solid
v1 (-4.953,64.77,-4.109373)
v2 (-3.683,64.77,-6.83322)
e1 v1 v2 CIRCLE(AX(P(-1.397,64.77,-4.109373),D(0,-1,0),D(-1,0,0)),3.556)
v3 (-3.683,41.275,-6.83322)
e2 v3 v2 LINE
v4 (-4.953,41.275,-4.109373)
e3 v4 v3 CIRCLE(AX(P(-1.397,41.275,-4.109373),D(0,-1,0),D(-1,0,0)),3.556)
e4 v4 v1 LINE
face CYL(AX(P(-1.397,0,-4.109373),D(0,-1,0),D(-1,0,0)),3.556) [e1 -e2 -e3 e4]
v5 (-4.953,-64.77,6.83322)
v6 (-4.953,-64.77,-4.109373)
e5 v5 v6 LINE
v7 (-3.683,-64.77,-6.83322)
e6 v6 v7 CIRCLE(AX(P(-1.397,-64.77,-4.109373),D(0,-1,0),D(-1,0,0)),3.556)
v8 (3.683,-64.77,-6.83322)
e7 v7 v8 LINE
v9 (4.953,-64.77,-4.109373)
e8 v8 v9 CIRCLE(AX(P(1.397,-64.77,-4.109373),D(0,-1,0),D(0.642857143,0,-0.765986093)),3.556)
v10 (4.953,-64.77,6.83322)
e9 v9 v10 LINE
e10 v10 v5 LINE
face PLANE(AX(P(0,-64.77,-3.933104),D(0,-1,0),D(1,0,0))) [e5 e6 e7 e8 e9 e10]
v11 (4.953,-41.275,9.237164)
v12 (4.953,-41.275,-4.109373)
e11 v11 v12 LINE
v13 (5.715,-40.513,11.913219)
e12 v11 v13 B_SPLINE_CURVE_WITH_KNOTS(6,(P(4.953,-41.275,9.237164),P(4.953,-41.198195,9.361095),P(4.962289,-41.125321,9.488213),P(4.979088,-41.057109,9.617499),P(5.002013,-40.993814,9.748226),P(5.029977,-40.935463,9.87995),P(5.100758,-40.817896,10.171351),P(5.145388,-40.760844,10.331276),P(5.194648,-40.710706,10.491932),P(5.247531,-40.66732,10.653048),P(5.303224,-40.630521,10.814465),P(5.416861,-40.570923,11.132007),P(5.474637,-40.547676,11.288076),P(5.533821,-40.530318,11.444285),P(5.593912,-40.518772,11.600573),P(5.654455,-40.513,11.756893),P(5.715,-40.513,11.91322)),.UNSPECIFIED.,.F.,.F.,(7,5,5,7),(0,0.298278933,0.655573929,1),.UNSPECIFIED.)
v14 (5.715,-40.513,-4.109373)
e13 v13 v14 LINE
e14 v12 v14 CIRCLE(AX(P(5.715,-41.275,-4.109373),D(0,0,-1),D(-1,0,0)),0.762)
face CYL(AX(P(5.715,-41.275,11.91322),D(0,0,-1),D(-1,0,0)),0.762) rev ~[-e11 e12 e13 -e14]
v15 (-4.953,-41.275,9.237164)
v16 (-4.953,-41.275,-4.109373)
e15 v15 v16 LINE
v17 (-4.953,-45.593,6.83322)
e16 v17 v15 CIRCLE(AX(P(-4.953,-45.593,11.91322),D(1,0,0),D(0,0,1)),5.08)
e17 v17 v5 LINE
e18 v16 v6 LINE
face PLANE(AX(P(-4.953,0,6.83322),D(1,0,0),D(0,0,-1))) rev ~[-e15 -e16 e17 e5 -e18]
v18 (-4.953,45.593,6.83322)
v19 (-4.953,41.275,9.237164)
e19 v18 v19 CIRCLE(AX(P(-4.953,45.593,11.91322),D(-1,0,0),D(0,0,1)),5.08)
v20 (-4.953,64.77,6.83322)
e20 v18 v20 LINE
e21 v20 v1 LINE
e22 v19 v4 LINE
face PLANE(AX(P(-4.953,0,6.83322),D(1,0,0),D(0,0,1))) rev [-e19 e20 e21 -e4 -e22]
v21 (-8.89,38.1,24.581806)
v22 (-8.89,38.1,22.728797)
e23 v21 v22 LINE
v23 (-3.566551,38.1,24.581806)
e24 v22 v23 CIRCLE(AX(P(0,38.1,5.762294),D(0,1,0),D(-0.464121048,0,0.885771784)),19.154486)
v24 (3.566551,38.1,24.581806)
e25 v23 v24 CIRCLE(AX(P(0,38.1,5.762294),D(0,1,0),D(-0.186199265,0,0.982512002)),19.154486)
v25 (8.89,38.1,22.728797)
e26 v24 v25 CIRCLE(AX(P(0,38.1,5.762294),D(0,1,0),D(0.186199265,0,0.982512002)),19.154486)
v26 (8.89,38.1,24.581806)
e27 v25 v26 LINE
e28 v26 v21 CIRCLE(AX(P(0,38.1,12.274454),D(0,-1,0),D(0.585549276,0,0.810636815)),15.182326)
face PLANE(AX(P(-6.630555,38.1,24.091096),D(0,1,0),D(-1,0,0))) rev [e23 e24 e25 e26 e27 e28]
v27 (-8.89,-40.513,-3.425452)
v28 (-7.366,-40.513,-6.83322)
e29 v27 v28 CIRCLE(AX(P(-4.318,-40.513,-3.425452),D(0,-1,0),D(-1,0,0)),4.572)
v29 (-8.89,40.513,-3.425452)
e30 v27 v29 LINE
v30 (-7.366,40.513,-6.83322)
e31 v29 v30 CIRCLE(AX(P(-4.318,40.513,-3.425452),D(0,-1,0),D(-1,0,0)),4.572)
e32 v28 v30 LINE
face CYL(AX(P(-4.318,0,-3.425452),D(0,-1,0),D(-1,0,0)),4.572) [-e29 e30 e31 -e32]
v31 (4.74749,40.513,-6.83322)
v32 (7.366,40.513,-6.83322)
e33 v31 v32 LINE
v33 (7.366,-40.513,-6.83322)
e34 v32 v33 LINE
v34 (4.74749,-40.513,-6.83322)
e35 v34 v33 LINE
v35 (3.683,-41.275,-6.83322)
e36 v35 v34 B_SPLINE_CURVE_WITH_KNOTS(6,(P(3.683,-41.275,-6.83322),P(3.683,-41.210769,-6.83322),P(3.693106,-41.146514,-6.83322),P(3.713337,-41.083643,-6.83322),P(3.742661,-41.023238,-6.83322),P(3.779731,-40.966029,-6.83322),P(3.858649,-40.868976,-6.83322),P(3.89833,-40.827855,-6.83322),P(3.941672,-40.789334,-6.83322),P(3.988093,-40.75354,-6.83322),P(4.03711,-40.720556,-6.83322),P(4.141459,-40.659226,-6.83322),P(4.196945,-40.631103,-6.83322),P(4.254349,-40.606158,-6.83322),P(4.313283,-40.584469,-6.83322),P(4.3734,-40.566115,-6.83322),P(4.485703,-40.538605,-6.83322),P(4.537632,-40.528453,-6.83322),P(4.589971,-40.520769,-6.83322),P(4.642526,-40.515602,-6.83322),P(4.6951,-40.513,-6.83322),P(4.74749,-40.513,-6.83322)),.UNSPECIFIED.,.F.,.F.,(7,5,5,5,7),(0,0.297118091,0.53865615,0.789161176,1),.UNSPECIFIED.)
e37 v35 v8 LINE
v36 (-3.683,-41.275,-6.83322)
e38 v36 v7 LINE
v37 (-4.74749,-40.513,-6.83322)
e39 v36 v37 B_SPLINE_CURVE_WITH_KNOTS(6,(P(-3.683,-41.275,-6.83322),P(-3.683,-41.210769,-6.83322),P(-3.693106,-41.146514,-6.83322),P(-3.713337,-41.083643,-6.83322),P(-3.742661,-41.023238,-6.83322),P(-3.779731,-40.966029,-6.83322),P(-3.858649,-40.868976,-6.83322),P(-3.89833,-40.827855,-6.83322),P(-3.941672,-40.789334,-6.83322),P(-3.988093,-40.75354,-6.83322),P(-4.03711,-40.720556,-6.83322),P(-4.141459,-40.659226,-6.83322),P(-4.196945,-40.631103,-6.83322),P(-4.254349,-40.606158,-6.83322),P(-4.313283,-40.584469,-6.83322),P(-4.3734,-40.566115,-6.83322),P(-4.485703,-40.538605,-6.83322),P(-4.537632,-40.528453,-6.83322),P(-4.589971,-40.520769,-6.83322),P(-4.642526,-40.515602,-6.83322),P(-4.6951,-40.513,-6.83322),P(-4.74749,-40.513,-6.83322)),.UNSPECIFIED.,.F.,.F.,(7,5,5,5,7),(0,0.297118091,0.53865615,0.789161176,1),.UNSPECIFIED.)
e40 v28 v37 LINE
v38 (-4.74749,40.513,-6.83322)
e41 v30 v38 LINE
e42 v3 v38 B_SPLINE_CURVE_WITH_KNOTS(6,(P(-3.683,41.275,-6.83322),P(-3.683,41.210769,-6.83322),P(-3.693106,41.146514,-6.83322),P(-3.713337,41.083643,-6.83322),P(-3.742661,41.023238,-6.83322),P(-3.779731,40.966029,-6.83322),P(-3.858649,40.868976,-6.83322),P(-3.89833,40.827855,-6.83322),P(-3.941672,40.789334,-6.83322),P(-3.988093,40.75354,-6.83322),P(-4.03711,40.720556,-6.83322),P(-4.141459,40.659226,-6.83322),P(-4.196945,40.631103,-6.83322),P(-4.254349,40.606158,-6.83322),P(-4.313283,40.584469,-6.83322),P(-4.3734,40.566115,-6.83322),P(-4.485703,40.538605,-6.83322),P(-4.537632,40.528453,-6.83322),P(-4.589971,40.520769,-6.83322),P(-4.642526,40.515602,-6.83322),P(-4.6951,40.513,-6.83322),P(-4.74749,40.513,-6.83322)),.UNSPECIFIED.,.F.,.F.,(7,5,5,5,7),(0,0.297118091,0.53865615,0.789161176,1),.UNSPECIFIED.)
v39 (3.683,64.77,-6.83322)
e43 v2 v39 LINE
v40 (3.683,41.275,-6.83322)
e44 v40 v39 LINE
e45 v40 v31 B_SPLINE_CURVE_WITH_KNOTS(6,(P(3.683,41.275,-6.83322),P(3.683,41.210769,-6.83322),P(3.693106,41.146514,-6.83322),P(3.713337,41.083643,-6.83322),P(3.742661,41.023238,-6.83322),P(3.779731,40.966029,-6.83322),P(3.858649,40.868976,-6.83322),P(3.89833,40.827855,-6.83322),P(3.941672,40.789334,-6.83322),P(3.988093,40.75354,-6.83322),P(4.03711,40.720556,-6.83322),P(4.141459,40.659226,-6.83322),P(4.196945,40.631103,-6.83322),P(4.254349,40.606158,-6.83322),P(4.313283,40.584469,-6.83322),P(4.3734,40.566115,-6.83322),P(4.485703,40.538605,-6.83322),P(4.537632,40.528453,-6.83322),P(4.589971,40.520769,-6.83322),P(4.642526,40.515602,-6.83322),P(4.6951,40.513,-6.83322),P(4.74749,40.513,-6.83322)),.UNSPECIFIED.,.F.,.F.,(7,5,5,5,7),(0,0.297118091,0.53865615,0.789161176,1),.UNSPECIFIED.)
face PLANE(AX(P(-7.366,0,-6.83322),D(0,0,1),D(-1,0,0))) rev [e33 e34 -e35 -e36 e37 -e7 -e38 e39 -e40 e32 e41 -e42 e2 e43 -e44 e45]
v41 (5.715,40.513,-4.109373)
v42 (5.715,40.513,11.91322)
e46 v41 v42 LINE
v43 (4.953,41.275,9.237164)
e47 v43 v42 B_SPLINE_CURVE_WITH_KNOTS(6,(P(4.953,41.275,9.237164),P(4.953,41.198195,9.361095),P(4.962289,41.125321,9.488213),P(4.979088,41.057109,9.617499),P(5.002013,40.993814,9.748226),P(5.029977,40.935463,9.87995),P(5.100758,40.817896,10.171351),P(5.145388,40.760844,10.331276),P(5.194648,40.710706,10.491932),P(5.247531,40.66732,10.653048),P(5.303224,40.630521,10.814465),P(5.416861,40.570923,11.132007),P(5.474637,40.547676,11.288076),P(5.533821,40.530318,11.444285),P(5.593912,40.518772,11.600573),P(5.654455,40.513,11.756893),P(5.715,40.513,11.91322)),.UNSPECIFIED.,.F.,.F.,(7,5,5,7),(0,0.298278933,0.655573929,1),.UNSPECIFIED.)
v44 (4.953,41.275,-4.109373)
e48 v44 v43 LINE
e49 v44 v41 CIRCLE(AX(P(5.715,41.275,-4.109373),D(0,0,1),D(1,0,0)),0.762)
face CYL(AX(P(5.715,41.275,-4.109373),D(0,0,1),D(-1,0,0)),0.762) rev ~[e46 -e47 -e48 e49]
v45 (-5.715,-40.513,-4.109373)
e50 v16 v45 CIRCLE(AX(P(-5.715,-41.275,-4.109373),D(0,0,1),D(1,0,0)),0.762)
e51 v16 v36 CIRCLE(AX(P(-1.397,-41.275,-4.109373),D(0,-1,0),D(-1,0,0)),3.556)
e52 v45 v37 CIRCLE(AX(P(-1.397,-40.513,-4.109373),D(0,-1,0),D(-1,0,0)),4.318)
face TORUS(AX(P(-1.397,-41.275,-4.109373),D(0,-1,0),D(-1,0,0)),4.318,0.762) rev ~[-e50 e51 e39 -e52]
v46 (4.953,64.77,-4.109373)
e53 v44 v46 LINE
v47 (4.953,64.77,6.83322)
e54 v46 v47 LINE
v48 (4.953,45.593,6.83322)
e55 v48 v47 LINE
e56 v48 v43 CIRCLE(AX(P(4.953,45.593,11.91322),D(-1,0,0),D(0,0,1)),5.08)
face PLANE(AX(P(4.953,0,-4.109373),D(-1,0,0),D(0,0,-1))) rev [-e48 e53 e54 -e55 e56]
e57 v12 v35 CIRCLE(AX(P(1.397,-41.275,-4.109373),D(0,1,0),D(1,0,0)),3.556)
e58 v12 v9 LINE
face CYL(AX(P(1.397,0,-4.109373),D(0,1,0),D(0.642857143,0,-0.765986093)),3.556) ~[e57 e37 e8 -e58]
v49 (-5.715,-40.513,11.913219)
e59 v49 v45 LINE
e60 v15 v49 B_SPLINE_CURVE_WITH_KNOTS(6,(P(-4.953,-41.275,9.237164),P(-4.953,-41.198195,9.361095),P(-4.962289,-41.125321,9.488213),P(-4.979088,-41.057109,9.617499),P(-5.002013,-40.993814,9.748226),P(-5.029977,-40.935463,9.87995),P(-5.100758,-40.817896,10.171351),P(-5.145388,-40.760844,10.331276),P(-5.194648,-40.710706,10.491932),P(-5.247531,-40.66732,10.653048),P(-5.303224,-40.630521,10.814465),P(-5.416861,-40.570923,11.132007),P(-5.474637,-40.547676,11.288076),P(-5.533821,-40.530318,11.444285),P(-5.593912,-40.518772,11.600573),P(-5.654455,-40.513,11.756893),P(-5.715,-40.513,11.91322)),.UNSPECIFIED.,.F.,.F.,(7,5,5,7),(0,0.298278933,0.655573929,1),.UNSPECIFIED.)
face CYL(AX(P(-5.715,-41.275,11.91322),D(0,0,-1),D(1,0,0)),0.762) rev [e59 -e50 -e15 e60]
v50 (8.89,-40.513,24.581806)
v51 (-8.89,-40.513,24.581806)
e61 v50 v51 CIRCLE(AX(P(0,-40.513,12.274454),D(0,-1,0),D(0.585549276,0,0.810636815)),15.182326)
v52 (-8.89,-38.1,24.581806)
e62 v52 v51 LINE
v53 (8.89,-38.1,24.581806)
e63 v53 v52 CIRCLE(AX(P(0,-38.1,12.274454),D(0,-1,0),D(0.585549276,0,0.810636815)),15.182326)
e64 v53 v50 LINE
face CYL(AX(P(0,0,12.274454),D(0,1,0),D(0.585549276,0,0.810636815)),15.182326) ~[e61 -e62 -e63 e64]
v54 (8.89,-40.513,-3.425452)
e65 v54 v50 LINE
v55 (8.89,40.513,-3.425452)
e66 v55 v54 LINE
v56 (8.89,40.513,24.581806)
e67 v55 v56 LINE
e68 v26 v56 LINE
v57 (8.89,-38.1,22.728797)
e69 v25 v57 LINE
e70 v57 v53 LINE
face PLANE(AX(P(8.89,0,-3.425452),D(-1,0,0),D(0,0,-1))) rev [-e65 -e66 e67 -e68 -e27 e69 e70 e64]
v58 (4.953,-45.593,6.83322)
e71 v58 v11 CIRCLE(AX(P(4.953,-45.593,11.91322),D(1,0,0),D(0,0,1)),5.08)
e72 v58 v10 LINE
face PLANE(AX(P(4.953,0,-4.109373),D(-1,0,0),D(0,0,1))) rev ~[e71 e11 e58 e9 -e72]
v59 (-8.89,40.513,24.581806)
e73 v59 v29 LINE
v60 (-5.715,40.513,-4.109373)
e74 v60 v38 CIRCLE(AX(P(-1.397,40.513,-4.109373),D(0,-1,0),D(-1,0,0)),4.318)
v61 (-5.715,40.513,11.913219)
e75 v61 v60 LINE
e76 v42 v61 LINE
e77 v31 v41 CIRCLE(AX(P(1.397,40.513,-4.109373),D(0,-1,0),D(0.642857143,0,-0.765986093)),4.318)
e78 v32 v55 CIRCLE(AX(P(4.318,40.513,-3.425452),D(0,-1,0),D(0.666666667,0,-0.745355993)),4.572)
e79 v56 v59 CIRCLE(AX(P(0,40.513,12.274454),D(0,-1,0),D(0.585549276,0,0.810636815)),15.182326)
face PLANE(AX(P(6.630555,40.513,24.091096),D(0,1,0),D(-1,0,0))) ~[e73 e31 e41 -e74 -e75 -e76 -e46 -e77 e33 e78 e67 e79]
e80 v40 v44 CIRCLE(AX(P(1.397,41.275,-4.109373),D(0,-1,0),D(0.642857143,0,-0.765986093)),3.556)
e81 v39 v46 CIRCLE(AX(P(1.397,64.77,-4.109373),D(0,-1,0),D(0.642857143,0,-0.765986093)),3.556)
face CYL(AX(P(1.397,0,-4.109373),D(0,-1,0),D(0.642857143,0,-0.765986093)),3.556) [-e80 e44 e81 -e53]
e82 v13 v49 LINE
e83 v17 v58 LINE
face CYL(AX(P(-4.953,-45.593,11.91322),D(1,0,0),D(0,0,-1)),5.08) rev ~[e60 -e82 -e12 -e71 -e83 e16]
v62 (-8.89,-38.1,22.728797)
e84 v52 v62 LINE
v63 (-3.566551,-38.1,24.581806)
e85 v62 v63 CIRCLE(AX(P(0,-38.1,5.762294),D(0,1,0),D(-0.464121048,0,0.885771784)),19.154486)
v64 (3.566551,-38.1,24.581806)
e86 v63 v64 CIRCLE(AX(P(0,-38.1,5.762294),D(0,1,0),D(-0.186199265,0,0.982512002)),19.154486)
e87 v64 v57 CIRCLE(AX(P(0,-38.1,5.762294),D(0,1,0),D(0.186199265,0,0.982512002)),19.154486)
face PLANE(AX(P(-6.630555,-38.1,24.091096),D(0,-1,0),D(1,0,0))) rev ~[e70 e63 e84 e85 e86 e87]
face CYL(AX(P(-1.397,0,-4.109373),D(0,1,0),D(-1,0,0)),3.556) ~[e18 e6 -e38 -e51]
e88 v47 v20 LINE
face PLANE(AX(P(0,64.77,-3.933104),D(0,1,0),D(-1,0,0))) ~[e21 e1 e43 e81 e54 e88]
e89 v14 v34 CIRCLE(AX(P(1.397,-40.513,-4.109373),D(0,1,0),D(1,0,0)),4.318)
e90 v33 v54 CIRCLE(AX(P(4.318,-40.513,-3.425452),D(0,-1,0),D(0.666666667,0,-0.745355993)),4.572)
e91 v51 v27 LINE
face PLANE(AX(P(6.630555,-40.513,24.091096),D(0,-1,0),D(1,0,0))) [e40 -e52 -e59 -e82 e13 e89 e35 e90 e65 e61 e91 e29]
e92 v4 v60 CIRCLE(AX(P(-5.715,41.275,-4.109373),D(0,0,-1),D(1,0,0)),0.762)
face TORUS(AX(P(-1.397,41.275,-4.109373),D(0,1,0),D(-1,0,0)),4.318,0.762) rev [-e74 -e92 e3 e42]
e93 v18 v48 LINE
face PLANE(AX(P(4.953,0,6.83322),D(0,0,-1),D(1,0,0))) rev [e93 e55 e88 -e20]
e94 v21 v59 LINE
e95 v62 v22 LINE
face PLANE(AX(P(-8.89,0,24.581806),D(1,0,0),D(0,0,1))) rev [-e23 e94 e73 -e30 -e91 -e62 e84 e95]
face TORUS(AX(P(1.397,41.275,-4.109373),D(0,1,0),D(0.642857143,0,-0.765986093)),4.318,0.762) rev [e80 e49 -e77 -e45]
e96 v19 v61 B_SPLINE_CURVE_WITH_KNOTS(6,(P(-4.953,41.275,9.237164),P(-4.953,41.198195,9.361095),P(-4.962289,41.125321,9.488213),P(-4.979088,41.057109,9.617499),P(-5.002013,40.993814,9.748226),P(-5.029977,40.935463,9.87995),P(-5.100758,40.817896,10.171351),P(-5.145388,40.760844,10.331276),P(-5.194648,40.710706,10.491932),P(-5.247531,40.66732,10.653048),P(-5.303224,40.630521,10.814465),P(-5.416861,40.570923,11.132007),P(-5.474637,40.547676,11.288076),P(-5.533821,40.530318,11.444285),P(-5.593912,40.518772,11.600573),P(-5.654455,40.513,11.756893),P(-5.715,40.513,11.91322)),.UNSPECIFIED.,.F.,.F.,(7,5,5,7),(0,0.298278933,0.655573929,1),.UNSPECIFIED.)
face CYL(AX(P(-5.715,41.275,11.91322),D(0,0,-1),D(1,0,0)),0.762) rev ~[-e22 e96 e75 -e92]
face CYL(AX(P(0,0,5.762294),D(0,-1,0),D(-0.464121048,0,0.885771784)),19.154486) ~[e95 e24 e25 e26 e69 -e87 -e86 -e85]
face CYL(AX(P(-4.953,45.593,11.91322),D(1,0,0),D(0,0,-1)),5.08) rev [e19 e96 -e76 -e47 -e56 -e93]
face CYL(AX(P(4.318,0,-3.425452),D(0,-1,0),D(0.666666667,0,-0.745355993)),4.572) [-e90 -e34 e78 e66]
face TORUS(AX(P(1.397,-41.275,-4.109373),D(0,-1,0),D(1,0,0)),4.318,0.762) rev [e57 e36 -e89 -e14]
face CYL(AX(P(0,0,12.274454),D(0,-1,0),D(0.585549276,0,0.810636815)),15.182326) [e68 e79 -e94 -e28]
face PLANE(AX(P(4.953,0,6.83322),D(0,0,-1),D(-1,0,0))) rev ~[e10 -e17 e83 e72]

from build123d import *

# Parameters (mm, degrees)
F1_DEPTH = 40.513
F2_DEPTH = 38.1
F3_DEPTH = 64.77
F5_R     = 5.08
F6_R     = 0.762


with BuildPart() as f1:
    # F0 (on Front) → F1 (new body)
    with BuildSketch(Plane.XZ):
        with BuildLine():
            Line((8.89, 22.7287972945), (8.89, 24.5818064272))
            Line((8.89, 24.5818064272), (3.5665511583, 24.5818064272))
            ThreePointArc((3.5665511583, 24.5818064272), (6.2968108914, 23.8521946995), (8.89, 22.7287972945))
        make_face()
        with BuildLine():
            Line((3.5665511583, 24.5818064272), (8.89, 24.5818064272))
            ThreePointArc((8.89, 24.5818064272), (0, 27.4567800376), (-8.89, 24.5818064272))
            Line((-8.89, 24.5818064272), (-3.5665511583, 24.5818064272))
            ThreePointArc((-3.5665511583, 24.5818064272), (0, 24.9167800376), (3.5665511583, 24.5818064272))
        make_face()
        with BuildLine():
            ThreePointArc((8.89, 22.7287972945), (6.2968108914, 23.8521946995), (3.5665511583, 24.5818064272))
            Line((3.5665511583, 24.5818064272), (-3.5665511583, 24.5818064272))
            ThreePointArc((-3.5665511583, 24.5818064272), (-6.2968108914, 23.8521946995), (-8.89, 22.7287972945))
            Line((-8.89, 22.7287972945), (8.89, 22.7287972945))
        make_face()
        with BuildLine():
            Line((-3.5665511583, 24.5818064272), (3.5665511583, 24.5818064272))
            ThreePointArc((3.5665511583, 24.5818064272), (0, 24.9167800376), (-3.5665511583, 24.5818064272))
        make_face()
        with BuildLine():
            Line((8.89, -3.4254523647), (8.89, 22.7287972945))
            Line((8.89, 22.7287972945), (-8.89, 22.7287972945))
            Line((-8.89, 22.7287972945), (-8.89, -3.4254523647))
            ThreePointArc((-8.89, -3.4254523647), (-8.4916458882, -5.2919635487), (-7.366, -6.8332199624))
            Line((-7.366, -6.8332199624), (-4.953, -6.8332199624))
            Line((-4.953, -6.8332199624), (-4.953, -4.1093734175))
            Line((-4.953, -4.1093734175), (-4.953, 0))
            Line((-4.953, 0), (-4.953, 6.8332199624))
            Line((-4.953, 6.8332199624), (4.953, 6.8332199624))
            Line((4.953, 6.8332199624), (4.953, 0))
            Line((4.953, 0), (4.953, -4.1093734175))
            Line((4.953, -4.1093734175), (4.953, -6.8332199624))
            Line((4.953, -6.8332199624), (7.366, -6.8332199624))
            ThreePointArc((7.366, -6.8332199624), (8.4916458882, -5.2919635487), (8.89, -3.4254523647))
        make_face()
        with BuildLine():
            Line((-3.5665511583, 24.5818064272), (-8.89, 24.5818064272))
            Line((-8.89, 24.5818064272), (-8.89, 22.7287972945))
            ThreePointArc((-8.89, 22.7287972945), (-6.2968108914, 23.8521946995), (-3.5665511583, 24.5818064272))
        make_face()
        with BuildLine():
            Line((3.683, -6.8332199624), (4.953, -6.8332199624))
            Line((4.953, -6.8332199624), (4.953, -4.1093734175))
            ThreePointArc((4.953, -4.1093734175), (4.6198986953, -5.6120576825), (3.683, -6.8332199624))
        make_face()
        with BuildLine():
            Line((-3.683, -6.8332199624), (3.683, -6.8332199624))
            ThreePointArc((3.683, -6.8332199624), (4.6198986953, -5.6120576825), (4.953, -4.1093734175))
            Line((4.953, -4.1093734175), (4.953, 0))
            ThreePointArc((4.953, 0), (0, -4.953), (-4.953, 0))
            Line((-4.953, 0), (-4.953, -4.1093734175))
            ThreePointArc((-4.953, -4.1093734175), (-4.6198986953, -5.6120576825), (-3.683, -6.8332199624))
        make_face()
        with BuildLine():
            Line((-4.953, -4.1093734175), (-4.953, -6.8332199624))
            Line((-4.953, -6.8332199624), (-3.683, -6.8332199624))
            ThreePointArc((-3.683, -6.8332199624), (-4.6198986953, -5.6120576825), (-4.953, -4.1093734175))
        make_face()
        with BuildLine():
            ThreePointArc((-4.953, 0), (0, -4.953), (4.953, 0))
            ThreePointArc((4.953, 0), (0, 4.953), (-4.953, 0))
        make_face()
        with BuildLine():
            ThreePointArc((-4.953, 0), (0, 4.953), (4.953, 0))
            Line((4.953, 0), (4.953, 6.8332199624))
            Line((4.953, 6.8332199624), (-4.953, 6.8332199624))
            Line((-4.953, 6.8332199624), (-4.953, 0))
        make_face()
    extrude(amount=F1_DEPTH)

    # F0 (on Front) → F2 (cut)
    with BuildSketch(Plane.XZ):
        with BuildLine():
            Line((-3.5665511583, 24.5818064272), (-8.89, 24.5818064272))
            Line((-8.89, 24.5818064272), (-8.89, 22.7287972945))
            ThreePointArc((-8.89, 22.7287972945), (-6.2968108914, 23.8521946995), (-3.5665511583, 24.5818064272))
        make_face()
        with BuildLine():
            Line((3.5665511583, 24.5818064272), (8.89, 24.5818064272))
            ThreePointArc((8.89, 24.5818064272), (0, 27.4567800376), (-8.89, 24.5818064272))
            Line((-8.89, 24.5818064272), (-3.5665511583, 24.5818064272))
            ThreePointArc((-3.5665511583, 24.5818064272), (0, 24.9167800376), (3.5665511583, 24.5818064272))
        make_face()
        with BuildLine():
            Line((8.89, 22.7287972945), (8.89, 24.5818064272))
            Line((8.89, 24.5818064272), (3.5665511583, 24.5818064272))
            ThreePointArc((3.5665511583, 24.5818064272), (6.2968108914, 23.8521946995), (8.89, 22.7287972945))
        make_face()
    extrude(amount=F2_DEPTH, mode=Mode.SUBTRACT)

    # F0 (on Front) → F3 (join)
    with BuildSketch(Plane.XZ):
        with BuildLine():
            Line((-3.683, -6.8332199624), (3.683, -6.8332199624))
            ThreePointArc((3.683, -6.8332199624), (4.6198986953, -5.6120576825), (4.953, -4.1093734175))
            Line((4.953, -4.1093734175), (4.953, 0))
            ThreePointArc((4.953, 0), (0, -4.953), (-4.953, 0))
            Line((-4.953, 0), (-4.953, -4.1093734175))
            ThreePointArc((-4.953, -4.1093734175), (-4.6198986953, -5.6120576825), (-3.683, -6.8332199624))
        make_face()
        with BuildLine():
            ThreePointArc((-4.953, 0), (0, -4.953), (4.953, 0))
            ThreePointArc((4.953, 0), (0, 4.953), (-4.953, 0))
        make_face()
        with BuildLine():
            ThreePointArc((-4.953, 0), (0, 4.953), (4.953, 0))
            Line((4.953, 0), (4.953, 6.8332199624))
            Line((4.953, 6.8332199624), (-4.953, 6.8332199624))
            Line((-4.953, 6.8332199624), (-4.953, 0))
        make_face()
    extrude(amount=F3_DEPTH)

    # F4: F1 across plane


with BuildPart() as f1_1:
    add(f1.part)
    add(f1.part.mirror(Plane.XZ))

    # F5
    f5_edges = [f1_1.edges().sort_by_distance(p)[0] for p in [
        (0, -40.513, 6.83322),
        (0, 40.513, 6.83322),
    ]]
    fillet(f5_edges, radius=F5_R)

    # F6
    f6_edges = [f1_1.edges().sort_by_distance(p)[0] for p in [
        (-4.953, 40.513, 1.361923),
        (-4.619899, 40.513, -5.612058),
        (-4.953, -40.513, 1.361923),
        (-4.619899, -40.513, -5.612058),
        (4.619899, -40.513, -5.612058),
        (4.953, -40.513, 1.361923),
        (4.953, 40.513, 1.361923),
        (4.619899, 40.513, -5.612058),
        (-4.953, 40.513, 9.37322),
        (4.953, 40.513, 9.37322),
        (-4.953, -40.513, 9.37322),
        (4.953, -40.513, 9.37322),
    ]]
    fillet(f6_edges, radius=F6_R)


solid = f1_1.part
